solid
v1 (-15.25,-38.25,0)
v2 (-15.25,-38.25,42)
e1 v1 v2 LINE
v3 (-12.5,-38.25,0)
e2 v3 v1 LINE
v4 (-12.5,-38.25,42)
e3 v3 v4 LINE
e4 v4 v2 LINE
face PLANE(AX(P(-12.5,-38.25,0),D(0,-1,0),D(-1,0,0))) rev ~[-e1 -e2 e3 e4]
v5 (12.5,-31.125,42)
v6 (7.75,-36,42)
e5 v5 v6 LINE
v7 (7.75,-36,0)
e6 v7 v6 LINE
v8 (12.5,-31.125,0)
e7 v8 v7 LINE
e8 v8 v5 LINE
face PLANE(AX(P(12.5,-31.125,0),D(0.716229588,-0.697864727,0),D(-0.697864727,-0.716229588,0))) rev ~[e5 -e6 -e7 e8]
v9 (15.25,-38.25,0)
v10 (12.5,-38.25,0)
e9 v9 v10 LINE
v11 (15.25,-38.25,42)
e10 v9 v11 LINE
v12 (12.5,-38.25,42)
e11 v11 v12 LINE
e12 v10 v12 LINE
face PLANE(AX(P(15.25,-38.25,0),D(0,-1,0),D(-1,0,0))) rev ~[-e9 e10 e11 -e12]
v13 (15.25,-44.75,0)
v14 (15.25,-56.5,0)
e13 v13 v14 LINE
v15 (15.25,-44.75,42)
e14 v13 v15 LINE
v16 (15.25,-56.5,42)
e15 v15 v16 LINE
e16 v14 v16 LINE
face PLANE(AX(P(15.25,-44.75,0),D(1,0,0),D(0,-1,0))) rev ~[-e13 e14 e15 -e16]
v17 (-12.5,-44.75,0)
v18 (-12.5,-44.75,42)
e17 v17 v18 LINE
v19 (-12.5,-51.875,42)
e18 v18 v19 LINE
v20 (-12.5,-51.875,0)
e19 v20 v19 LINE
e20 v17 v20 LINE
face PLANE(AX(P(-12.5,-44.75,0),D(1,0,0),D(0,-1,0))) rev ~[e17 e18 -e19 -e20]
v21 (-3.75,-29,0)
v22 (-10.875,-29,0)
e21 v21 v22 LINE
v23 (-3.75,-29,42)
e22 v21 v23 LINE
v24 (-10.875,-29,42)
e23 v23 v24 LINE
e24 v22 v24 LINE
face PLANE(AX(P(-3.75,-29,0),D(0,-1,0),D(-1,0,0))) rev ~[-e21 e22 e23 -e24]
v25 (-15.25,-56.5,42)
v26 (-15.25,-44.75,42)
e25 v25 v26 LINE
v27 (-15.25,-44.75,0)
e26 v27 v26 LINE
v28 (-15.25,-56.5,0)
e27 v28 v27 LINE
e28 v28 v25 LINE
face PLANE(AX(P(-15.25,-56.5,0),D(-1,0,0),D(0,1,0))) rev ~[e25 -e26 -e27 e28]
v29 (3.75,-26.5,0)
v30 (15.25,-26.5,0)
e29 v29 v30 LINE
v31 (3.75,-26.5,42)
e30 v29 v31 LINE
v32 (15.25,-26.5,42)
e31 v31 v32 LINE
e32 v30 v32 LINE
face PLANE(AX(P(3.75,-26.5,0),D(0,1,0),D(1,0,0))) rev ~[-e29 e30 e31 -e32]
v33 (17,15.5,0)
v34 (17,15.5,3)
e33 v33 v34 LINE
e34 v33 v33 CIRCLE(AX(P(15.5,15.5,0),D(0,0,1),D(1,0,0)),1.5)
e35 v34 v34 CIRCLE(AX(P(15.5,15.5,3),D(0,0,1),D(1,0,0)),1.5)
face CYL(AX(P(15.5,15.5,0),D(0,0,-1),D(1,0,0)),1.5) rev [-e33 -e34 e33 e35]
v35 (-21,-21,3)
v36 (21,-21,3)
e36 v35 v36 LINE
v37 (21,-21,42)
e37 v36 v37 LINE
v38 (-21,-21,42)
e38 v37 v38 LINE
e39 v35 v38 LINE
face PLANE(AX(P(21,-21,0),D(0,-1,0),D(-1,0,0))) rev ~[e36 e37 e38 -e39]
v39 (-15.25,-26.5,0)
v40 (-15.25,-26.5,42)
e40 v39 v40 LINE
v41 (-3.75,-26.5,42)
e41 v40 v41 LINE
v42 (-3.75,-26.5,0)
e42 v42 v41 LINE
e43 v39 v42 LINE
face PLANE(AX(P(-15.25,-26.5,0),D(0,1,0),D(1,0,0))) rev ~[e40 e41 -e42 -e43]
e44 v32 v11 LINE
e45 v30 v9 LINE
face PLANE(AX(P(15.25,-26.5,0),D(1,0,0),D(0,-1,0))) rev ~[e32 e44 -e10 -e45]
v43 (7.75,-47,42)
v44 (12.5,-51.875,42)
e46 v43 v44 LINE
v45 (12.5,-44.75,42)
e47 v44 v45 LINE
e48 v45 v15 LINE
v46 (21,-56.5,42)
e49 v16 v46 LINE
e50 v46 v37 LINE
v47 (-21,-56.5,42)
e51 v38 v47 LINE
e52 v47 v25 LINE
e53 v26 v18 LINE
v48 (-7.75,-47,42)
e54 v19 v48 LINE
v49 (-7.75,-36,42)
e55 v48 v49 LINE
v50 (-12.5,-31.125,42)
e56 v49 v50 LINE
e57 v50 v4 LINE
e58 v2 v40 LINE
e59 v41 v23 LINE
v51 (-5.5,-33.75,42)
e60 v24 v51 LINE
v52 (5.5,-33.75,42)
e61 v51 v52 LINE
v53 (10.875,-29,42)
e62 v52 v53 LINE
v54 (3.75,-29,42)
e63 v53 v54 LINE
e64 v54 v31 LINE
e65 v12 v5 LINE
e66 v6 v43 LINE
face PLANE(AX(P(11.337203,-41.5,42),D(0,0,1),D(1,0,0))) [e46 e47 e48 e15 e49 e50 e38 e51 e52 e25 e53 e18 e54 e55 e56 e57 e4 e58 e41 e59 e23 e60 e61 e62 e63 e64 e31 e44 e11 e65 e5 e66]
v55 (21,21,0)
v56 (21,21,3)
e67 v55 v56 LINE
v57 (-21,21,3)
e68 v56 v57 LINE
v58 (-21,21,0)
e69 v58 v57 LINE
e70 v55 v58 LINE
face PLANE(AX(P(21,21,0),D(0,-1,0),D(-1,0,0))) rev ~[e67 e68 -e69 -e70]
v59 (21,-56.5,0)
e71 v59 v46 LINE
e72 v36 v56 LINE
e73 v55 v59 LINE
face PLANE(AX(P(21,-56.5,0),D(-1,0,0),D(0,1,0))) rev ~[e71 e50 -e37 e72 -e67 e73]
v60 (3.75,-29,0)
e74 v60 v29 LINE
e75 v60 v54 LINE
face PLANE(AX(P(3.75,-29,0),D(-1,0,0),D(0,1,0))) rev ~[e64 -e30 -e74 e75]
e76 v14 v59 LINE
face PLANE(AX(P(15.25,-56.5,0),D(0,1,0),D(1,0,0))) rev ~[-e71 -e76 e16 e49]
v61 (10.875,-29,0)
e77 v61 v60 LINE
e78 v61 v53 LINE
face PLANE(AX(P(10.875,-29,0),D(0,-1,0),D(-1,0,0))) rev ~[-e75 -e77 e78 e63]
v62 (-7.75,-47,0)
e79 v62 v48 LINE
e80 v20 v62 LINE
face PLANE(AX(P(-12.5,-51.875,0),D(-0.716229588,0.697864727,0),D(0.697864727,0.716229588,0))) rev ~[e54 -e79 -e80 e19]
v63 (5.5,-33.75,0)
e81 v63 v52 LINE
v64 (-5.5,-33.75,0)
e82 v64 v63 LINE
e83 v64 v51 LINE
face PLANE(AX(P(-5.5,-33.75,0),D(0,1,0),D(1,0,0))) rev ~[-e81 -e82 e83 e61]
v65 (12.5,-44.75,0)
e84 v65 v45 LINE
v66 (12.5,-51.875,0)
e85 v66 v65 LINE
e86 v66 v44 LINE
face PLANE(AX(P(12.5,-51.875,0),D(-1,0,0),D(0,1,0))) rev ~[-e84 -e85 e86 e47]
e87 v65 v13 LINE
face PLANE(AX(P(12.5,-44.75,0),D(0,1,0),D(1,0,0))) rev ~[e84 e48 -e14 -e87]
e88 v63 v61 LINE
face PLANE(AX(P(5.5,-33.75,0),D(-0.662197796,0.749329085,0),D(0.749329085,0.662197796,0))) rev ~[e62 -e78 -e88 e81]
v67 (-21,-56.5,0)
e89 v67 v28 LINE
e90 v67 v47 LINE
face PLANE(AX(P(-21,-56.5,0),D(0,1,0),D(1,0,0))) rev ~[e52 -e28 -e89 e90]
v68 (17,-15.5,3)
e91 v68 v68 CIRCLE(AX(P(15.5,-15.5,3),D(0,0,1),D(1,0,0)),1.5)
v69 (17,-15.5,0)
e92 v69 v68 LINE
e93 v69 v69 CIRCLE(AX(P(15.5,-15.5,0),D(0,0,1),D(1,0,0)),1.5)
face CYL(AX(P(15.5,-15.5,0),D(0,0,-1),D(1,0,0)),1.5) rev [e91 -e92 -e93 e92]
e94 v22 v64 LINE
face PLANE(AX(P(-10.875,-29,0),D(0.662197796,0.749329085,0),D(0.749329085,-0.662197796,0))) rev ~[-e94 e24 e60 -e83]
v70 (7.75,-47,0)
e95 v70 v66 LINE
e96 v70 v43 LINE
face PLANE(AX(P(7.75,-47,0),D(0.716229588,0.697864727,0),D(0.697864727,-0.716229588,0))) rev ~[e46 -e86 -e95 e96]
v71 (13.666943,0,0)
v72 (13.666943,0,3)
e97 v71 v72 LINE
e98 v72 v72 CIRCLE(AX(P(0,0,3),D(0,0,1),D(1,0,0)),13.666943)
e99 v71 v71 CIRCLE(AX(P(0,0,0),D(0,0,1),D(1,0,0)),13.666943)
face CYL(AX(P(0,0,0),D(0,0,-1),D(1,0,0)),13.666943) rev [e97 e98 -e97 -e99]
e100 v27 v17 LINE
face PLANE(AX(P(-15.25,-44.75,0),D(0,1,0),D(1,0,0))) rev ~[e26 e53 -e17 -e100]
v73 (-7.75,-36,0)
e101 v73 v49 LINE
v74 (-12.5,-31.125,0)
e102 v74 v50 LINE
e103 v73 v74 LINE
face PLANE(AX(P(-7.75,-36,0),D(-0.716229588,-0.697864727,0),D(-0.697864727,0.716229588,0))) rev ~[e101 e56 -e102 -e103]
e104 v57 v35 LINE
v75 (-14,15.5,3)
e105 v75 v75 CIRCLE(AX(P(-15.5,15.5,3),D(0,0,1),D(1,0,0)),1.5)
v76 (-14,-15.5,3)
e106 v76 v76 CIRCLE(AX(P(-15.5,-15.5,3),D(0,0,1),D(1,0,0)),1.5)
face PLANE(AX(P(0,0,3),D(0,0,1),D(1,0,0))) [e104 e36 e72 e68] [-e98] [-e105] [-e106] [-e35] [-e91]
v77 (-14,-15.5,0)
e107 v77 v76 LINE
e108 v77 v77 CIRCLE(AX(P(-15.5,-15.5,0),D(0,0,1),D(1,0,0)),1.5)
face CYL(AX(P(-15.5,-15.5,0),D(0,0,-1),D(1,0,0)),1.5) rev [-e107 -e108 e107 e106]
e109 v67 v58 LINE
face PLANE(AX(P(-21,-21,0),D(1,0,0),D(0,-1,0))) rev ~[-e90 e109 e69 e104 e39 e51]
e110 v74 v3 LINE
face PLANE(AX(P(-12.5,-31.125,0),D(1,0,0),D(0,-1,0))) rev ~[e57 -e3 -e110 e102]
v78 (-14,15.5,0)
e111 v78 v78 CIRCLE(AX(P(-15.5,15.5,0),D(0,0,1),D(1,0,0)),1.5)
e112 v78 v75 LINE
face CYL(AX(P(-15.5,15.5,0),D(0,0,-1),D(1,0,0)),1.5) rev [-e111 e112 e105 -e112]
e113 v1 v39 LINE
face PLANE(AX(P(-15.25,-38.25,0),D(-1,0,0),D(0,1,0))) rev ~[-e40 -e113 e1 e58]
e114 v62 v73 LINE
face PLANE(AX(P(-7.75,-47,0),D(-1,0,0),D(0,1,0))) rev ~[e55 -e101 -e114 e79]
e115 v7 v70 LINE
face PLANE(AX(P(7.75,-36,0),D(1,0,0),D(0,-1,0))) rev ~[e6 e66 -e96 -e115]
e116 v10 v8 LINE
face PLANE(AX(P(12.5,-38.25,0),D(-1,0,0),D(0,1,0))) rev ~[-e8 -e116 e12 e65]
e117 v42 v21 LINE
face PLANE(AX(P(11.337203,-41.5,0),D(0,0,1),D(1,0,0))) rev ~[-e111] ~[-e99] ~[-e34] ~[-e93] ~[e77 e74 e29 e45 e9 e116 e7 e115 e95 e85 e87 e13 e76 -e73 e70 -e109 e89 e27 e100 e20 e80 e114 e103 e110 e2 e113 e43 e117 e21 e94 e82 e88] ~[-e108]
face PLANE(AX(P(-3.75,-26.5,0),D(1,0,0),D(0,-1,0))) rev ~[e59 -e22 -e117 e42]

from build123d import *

# Parameters (mm, degrees)
F0_R     = 1.5
F0_R_2   = 13.6669430684
F1_DEPTH = 3
F2_DEPTH = 42


# Not quite as in the source:
# - a feature names something its author has since deleted; it is built from what else it names


with BuildPart() as f1:
    # F0 (on Top) → F1 (new body)
    with BuildSketch(Plane.XY):
        Polygon((21, 21), (-21, 21), (-21, -21), (-3.25, -21), (0, -21), (3.25, -21), (21, -21), align=None)
        with Locations((-15.5, -15.5)):
            Circle(F0_R, mode=Mode.SUBTRACT)
        with Locations((-15.5, 15.5)):
            Circle(F0_R, mode=Mode.SUBTRACT)
        Circle(F0_R_2, mode=Mode.SUBTRACT)
        with Locations((15.5, -15.5)):
            Circle(F0_R, mode=Mode.SUBTRACT)
        with Locations((15.5, 15.5)):
            Circle(F0_R, mode=Mode.SUBTRACT)
    extrude(amount=F1_DEPTH)

    # F0 (on Top) → F2 (join)
    with BuildSketch(Plane.XY):
        Polygon((12.5, -44.75), (15.25, -44.75), (15.25, -38.25), (12.5, -38.25), (12.5, -31.125), (7.75, -36), (7.75, -41.5), (7.75, -47), (12.5, -51.875), align=None)
        Polygon((-3.25, -21), (-21, -21), (-21, -26.5), (-21, -56.5), (-15.25, -56.5), (-15.25, -44.75), (-15.25, -38.25), (-15.25, -26.5), (-3.75, -26.5), (0, -26.5), (3.75, -26.5), (15.25, -26.5), (15.25, -38.25), (15.25, -44.75), (15.25, -56.5), (21, -56.5), (21, -26.5), (21, -21), (3.25, -21), (0, -21), align=None)
        Polygon((0, -26.5), (-3.75, -26.5), (-3.75, -29), (-10.875, -29), (-5.5, -33.75), (0, -33.75), (5.5, -33.75), (10.875, -29), (3.75, -29), (3.75, -26.5), align=None)
        Polygon((-15.25, -38.25), (-15.25, -44.75), (-12.5, -44.75), (-12.5, -51.875), (-7.75, -47), (-7.75, -41.5), (-7.75, -36), (-12.5, -31.125), (-12.5, -38.25), align=None)
    extrude(amount=F2_DEPTH)


solid = f1.part
